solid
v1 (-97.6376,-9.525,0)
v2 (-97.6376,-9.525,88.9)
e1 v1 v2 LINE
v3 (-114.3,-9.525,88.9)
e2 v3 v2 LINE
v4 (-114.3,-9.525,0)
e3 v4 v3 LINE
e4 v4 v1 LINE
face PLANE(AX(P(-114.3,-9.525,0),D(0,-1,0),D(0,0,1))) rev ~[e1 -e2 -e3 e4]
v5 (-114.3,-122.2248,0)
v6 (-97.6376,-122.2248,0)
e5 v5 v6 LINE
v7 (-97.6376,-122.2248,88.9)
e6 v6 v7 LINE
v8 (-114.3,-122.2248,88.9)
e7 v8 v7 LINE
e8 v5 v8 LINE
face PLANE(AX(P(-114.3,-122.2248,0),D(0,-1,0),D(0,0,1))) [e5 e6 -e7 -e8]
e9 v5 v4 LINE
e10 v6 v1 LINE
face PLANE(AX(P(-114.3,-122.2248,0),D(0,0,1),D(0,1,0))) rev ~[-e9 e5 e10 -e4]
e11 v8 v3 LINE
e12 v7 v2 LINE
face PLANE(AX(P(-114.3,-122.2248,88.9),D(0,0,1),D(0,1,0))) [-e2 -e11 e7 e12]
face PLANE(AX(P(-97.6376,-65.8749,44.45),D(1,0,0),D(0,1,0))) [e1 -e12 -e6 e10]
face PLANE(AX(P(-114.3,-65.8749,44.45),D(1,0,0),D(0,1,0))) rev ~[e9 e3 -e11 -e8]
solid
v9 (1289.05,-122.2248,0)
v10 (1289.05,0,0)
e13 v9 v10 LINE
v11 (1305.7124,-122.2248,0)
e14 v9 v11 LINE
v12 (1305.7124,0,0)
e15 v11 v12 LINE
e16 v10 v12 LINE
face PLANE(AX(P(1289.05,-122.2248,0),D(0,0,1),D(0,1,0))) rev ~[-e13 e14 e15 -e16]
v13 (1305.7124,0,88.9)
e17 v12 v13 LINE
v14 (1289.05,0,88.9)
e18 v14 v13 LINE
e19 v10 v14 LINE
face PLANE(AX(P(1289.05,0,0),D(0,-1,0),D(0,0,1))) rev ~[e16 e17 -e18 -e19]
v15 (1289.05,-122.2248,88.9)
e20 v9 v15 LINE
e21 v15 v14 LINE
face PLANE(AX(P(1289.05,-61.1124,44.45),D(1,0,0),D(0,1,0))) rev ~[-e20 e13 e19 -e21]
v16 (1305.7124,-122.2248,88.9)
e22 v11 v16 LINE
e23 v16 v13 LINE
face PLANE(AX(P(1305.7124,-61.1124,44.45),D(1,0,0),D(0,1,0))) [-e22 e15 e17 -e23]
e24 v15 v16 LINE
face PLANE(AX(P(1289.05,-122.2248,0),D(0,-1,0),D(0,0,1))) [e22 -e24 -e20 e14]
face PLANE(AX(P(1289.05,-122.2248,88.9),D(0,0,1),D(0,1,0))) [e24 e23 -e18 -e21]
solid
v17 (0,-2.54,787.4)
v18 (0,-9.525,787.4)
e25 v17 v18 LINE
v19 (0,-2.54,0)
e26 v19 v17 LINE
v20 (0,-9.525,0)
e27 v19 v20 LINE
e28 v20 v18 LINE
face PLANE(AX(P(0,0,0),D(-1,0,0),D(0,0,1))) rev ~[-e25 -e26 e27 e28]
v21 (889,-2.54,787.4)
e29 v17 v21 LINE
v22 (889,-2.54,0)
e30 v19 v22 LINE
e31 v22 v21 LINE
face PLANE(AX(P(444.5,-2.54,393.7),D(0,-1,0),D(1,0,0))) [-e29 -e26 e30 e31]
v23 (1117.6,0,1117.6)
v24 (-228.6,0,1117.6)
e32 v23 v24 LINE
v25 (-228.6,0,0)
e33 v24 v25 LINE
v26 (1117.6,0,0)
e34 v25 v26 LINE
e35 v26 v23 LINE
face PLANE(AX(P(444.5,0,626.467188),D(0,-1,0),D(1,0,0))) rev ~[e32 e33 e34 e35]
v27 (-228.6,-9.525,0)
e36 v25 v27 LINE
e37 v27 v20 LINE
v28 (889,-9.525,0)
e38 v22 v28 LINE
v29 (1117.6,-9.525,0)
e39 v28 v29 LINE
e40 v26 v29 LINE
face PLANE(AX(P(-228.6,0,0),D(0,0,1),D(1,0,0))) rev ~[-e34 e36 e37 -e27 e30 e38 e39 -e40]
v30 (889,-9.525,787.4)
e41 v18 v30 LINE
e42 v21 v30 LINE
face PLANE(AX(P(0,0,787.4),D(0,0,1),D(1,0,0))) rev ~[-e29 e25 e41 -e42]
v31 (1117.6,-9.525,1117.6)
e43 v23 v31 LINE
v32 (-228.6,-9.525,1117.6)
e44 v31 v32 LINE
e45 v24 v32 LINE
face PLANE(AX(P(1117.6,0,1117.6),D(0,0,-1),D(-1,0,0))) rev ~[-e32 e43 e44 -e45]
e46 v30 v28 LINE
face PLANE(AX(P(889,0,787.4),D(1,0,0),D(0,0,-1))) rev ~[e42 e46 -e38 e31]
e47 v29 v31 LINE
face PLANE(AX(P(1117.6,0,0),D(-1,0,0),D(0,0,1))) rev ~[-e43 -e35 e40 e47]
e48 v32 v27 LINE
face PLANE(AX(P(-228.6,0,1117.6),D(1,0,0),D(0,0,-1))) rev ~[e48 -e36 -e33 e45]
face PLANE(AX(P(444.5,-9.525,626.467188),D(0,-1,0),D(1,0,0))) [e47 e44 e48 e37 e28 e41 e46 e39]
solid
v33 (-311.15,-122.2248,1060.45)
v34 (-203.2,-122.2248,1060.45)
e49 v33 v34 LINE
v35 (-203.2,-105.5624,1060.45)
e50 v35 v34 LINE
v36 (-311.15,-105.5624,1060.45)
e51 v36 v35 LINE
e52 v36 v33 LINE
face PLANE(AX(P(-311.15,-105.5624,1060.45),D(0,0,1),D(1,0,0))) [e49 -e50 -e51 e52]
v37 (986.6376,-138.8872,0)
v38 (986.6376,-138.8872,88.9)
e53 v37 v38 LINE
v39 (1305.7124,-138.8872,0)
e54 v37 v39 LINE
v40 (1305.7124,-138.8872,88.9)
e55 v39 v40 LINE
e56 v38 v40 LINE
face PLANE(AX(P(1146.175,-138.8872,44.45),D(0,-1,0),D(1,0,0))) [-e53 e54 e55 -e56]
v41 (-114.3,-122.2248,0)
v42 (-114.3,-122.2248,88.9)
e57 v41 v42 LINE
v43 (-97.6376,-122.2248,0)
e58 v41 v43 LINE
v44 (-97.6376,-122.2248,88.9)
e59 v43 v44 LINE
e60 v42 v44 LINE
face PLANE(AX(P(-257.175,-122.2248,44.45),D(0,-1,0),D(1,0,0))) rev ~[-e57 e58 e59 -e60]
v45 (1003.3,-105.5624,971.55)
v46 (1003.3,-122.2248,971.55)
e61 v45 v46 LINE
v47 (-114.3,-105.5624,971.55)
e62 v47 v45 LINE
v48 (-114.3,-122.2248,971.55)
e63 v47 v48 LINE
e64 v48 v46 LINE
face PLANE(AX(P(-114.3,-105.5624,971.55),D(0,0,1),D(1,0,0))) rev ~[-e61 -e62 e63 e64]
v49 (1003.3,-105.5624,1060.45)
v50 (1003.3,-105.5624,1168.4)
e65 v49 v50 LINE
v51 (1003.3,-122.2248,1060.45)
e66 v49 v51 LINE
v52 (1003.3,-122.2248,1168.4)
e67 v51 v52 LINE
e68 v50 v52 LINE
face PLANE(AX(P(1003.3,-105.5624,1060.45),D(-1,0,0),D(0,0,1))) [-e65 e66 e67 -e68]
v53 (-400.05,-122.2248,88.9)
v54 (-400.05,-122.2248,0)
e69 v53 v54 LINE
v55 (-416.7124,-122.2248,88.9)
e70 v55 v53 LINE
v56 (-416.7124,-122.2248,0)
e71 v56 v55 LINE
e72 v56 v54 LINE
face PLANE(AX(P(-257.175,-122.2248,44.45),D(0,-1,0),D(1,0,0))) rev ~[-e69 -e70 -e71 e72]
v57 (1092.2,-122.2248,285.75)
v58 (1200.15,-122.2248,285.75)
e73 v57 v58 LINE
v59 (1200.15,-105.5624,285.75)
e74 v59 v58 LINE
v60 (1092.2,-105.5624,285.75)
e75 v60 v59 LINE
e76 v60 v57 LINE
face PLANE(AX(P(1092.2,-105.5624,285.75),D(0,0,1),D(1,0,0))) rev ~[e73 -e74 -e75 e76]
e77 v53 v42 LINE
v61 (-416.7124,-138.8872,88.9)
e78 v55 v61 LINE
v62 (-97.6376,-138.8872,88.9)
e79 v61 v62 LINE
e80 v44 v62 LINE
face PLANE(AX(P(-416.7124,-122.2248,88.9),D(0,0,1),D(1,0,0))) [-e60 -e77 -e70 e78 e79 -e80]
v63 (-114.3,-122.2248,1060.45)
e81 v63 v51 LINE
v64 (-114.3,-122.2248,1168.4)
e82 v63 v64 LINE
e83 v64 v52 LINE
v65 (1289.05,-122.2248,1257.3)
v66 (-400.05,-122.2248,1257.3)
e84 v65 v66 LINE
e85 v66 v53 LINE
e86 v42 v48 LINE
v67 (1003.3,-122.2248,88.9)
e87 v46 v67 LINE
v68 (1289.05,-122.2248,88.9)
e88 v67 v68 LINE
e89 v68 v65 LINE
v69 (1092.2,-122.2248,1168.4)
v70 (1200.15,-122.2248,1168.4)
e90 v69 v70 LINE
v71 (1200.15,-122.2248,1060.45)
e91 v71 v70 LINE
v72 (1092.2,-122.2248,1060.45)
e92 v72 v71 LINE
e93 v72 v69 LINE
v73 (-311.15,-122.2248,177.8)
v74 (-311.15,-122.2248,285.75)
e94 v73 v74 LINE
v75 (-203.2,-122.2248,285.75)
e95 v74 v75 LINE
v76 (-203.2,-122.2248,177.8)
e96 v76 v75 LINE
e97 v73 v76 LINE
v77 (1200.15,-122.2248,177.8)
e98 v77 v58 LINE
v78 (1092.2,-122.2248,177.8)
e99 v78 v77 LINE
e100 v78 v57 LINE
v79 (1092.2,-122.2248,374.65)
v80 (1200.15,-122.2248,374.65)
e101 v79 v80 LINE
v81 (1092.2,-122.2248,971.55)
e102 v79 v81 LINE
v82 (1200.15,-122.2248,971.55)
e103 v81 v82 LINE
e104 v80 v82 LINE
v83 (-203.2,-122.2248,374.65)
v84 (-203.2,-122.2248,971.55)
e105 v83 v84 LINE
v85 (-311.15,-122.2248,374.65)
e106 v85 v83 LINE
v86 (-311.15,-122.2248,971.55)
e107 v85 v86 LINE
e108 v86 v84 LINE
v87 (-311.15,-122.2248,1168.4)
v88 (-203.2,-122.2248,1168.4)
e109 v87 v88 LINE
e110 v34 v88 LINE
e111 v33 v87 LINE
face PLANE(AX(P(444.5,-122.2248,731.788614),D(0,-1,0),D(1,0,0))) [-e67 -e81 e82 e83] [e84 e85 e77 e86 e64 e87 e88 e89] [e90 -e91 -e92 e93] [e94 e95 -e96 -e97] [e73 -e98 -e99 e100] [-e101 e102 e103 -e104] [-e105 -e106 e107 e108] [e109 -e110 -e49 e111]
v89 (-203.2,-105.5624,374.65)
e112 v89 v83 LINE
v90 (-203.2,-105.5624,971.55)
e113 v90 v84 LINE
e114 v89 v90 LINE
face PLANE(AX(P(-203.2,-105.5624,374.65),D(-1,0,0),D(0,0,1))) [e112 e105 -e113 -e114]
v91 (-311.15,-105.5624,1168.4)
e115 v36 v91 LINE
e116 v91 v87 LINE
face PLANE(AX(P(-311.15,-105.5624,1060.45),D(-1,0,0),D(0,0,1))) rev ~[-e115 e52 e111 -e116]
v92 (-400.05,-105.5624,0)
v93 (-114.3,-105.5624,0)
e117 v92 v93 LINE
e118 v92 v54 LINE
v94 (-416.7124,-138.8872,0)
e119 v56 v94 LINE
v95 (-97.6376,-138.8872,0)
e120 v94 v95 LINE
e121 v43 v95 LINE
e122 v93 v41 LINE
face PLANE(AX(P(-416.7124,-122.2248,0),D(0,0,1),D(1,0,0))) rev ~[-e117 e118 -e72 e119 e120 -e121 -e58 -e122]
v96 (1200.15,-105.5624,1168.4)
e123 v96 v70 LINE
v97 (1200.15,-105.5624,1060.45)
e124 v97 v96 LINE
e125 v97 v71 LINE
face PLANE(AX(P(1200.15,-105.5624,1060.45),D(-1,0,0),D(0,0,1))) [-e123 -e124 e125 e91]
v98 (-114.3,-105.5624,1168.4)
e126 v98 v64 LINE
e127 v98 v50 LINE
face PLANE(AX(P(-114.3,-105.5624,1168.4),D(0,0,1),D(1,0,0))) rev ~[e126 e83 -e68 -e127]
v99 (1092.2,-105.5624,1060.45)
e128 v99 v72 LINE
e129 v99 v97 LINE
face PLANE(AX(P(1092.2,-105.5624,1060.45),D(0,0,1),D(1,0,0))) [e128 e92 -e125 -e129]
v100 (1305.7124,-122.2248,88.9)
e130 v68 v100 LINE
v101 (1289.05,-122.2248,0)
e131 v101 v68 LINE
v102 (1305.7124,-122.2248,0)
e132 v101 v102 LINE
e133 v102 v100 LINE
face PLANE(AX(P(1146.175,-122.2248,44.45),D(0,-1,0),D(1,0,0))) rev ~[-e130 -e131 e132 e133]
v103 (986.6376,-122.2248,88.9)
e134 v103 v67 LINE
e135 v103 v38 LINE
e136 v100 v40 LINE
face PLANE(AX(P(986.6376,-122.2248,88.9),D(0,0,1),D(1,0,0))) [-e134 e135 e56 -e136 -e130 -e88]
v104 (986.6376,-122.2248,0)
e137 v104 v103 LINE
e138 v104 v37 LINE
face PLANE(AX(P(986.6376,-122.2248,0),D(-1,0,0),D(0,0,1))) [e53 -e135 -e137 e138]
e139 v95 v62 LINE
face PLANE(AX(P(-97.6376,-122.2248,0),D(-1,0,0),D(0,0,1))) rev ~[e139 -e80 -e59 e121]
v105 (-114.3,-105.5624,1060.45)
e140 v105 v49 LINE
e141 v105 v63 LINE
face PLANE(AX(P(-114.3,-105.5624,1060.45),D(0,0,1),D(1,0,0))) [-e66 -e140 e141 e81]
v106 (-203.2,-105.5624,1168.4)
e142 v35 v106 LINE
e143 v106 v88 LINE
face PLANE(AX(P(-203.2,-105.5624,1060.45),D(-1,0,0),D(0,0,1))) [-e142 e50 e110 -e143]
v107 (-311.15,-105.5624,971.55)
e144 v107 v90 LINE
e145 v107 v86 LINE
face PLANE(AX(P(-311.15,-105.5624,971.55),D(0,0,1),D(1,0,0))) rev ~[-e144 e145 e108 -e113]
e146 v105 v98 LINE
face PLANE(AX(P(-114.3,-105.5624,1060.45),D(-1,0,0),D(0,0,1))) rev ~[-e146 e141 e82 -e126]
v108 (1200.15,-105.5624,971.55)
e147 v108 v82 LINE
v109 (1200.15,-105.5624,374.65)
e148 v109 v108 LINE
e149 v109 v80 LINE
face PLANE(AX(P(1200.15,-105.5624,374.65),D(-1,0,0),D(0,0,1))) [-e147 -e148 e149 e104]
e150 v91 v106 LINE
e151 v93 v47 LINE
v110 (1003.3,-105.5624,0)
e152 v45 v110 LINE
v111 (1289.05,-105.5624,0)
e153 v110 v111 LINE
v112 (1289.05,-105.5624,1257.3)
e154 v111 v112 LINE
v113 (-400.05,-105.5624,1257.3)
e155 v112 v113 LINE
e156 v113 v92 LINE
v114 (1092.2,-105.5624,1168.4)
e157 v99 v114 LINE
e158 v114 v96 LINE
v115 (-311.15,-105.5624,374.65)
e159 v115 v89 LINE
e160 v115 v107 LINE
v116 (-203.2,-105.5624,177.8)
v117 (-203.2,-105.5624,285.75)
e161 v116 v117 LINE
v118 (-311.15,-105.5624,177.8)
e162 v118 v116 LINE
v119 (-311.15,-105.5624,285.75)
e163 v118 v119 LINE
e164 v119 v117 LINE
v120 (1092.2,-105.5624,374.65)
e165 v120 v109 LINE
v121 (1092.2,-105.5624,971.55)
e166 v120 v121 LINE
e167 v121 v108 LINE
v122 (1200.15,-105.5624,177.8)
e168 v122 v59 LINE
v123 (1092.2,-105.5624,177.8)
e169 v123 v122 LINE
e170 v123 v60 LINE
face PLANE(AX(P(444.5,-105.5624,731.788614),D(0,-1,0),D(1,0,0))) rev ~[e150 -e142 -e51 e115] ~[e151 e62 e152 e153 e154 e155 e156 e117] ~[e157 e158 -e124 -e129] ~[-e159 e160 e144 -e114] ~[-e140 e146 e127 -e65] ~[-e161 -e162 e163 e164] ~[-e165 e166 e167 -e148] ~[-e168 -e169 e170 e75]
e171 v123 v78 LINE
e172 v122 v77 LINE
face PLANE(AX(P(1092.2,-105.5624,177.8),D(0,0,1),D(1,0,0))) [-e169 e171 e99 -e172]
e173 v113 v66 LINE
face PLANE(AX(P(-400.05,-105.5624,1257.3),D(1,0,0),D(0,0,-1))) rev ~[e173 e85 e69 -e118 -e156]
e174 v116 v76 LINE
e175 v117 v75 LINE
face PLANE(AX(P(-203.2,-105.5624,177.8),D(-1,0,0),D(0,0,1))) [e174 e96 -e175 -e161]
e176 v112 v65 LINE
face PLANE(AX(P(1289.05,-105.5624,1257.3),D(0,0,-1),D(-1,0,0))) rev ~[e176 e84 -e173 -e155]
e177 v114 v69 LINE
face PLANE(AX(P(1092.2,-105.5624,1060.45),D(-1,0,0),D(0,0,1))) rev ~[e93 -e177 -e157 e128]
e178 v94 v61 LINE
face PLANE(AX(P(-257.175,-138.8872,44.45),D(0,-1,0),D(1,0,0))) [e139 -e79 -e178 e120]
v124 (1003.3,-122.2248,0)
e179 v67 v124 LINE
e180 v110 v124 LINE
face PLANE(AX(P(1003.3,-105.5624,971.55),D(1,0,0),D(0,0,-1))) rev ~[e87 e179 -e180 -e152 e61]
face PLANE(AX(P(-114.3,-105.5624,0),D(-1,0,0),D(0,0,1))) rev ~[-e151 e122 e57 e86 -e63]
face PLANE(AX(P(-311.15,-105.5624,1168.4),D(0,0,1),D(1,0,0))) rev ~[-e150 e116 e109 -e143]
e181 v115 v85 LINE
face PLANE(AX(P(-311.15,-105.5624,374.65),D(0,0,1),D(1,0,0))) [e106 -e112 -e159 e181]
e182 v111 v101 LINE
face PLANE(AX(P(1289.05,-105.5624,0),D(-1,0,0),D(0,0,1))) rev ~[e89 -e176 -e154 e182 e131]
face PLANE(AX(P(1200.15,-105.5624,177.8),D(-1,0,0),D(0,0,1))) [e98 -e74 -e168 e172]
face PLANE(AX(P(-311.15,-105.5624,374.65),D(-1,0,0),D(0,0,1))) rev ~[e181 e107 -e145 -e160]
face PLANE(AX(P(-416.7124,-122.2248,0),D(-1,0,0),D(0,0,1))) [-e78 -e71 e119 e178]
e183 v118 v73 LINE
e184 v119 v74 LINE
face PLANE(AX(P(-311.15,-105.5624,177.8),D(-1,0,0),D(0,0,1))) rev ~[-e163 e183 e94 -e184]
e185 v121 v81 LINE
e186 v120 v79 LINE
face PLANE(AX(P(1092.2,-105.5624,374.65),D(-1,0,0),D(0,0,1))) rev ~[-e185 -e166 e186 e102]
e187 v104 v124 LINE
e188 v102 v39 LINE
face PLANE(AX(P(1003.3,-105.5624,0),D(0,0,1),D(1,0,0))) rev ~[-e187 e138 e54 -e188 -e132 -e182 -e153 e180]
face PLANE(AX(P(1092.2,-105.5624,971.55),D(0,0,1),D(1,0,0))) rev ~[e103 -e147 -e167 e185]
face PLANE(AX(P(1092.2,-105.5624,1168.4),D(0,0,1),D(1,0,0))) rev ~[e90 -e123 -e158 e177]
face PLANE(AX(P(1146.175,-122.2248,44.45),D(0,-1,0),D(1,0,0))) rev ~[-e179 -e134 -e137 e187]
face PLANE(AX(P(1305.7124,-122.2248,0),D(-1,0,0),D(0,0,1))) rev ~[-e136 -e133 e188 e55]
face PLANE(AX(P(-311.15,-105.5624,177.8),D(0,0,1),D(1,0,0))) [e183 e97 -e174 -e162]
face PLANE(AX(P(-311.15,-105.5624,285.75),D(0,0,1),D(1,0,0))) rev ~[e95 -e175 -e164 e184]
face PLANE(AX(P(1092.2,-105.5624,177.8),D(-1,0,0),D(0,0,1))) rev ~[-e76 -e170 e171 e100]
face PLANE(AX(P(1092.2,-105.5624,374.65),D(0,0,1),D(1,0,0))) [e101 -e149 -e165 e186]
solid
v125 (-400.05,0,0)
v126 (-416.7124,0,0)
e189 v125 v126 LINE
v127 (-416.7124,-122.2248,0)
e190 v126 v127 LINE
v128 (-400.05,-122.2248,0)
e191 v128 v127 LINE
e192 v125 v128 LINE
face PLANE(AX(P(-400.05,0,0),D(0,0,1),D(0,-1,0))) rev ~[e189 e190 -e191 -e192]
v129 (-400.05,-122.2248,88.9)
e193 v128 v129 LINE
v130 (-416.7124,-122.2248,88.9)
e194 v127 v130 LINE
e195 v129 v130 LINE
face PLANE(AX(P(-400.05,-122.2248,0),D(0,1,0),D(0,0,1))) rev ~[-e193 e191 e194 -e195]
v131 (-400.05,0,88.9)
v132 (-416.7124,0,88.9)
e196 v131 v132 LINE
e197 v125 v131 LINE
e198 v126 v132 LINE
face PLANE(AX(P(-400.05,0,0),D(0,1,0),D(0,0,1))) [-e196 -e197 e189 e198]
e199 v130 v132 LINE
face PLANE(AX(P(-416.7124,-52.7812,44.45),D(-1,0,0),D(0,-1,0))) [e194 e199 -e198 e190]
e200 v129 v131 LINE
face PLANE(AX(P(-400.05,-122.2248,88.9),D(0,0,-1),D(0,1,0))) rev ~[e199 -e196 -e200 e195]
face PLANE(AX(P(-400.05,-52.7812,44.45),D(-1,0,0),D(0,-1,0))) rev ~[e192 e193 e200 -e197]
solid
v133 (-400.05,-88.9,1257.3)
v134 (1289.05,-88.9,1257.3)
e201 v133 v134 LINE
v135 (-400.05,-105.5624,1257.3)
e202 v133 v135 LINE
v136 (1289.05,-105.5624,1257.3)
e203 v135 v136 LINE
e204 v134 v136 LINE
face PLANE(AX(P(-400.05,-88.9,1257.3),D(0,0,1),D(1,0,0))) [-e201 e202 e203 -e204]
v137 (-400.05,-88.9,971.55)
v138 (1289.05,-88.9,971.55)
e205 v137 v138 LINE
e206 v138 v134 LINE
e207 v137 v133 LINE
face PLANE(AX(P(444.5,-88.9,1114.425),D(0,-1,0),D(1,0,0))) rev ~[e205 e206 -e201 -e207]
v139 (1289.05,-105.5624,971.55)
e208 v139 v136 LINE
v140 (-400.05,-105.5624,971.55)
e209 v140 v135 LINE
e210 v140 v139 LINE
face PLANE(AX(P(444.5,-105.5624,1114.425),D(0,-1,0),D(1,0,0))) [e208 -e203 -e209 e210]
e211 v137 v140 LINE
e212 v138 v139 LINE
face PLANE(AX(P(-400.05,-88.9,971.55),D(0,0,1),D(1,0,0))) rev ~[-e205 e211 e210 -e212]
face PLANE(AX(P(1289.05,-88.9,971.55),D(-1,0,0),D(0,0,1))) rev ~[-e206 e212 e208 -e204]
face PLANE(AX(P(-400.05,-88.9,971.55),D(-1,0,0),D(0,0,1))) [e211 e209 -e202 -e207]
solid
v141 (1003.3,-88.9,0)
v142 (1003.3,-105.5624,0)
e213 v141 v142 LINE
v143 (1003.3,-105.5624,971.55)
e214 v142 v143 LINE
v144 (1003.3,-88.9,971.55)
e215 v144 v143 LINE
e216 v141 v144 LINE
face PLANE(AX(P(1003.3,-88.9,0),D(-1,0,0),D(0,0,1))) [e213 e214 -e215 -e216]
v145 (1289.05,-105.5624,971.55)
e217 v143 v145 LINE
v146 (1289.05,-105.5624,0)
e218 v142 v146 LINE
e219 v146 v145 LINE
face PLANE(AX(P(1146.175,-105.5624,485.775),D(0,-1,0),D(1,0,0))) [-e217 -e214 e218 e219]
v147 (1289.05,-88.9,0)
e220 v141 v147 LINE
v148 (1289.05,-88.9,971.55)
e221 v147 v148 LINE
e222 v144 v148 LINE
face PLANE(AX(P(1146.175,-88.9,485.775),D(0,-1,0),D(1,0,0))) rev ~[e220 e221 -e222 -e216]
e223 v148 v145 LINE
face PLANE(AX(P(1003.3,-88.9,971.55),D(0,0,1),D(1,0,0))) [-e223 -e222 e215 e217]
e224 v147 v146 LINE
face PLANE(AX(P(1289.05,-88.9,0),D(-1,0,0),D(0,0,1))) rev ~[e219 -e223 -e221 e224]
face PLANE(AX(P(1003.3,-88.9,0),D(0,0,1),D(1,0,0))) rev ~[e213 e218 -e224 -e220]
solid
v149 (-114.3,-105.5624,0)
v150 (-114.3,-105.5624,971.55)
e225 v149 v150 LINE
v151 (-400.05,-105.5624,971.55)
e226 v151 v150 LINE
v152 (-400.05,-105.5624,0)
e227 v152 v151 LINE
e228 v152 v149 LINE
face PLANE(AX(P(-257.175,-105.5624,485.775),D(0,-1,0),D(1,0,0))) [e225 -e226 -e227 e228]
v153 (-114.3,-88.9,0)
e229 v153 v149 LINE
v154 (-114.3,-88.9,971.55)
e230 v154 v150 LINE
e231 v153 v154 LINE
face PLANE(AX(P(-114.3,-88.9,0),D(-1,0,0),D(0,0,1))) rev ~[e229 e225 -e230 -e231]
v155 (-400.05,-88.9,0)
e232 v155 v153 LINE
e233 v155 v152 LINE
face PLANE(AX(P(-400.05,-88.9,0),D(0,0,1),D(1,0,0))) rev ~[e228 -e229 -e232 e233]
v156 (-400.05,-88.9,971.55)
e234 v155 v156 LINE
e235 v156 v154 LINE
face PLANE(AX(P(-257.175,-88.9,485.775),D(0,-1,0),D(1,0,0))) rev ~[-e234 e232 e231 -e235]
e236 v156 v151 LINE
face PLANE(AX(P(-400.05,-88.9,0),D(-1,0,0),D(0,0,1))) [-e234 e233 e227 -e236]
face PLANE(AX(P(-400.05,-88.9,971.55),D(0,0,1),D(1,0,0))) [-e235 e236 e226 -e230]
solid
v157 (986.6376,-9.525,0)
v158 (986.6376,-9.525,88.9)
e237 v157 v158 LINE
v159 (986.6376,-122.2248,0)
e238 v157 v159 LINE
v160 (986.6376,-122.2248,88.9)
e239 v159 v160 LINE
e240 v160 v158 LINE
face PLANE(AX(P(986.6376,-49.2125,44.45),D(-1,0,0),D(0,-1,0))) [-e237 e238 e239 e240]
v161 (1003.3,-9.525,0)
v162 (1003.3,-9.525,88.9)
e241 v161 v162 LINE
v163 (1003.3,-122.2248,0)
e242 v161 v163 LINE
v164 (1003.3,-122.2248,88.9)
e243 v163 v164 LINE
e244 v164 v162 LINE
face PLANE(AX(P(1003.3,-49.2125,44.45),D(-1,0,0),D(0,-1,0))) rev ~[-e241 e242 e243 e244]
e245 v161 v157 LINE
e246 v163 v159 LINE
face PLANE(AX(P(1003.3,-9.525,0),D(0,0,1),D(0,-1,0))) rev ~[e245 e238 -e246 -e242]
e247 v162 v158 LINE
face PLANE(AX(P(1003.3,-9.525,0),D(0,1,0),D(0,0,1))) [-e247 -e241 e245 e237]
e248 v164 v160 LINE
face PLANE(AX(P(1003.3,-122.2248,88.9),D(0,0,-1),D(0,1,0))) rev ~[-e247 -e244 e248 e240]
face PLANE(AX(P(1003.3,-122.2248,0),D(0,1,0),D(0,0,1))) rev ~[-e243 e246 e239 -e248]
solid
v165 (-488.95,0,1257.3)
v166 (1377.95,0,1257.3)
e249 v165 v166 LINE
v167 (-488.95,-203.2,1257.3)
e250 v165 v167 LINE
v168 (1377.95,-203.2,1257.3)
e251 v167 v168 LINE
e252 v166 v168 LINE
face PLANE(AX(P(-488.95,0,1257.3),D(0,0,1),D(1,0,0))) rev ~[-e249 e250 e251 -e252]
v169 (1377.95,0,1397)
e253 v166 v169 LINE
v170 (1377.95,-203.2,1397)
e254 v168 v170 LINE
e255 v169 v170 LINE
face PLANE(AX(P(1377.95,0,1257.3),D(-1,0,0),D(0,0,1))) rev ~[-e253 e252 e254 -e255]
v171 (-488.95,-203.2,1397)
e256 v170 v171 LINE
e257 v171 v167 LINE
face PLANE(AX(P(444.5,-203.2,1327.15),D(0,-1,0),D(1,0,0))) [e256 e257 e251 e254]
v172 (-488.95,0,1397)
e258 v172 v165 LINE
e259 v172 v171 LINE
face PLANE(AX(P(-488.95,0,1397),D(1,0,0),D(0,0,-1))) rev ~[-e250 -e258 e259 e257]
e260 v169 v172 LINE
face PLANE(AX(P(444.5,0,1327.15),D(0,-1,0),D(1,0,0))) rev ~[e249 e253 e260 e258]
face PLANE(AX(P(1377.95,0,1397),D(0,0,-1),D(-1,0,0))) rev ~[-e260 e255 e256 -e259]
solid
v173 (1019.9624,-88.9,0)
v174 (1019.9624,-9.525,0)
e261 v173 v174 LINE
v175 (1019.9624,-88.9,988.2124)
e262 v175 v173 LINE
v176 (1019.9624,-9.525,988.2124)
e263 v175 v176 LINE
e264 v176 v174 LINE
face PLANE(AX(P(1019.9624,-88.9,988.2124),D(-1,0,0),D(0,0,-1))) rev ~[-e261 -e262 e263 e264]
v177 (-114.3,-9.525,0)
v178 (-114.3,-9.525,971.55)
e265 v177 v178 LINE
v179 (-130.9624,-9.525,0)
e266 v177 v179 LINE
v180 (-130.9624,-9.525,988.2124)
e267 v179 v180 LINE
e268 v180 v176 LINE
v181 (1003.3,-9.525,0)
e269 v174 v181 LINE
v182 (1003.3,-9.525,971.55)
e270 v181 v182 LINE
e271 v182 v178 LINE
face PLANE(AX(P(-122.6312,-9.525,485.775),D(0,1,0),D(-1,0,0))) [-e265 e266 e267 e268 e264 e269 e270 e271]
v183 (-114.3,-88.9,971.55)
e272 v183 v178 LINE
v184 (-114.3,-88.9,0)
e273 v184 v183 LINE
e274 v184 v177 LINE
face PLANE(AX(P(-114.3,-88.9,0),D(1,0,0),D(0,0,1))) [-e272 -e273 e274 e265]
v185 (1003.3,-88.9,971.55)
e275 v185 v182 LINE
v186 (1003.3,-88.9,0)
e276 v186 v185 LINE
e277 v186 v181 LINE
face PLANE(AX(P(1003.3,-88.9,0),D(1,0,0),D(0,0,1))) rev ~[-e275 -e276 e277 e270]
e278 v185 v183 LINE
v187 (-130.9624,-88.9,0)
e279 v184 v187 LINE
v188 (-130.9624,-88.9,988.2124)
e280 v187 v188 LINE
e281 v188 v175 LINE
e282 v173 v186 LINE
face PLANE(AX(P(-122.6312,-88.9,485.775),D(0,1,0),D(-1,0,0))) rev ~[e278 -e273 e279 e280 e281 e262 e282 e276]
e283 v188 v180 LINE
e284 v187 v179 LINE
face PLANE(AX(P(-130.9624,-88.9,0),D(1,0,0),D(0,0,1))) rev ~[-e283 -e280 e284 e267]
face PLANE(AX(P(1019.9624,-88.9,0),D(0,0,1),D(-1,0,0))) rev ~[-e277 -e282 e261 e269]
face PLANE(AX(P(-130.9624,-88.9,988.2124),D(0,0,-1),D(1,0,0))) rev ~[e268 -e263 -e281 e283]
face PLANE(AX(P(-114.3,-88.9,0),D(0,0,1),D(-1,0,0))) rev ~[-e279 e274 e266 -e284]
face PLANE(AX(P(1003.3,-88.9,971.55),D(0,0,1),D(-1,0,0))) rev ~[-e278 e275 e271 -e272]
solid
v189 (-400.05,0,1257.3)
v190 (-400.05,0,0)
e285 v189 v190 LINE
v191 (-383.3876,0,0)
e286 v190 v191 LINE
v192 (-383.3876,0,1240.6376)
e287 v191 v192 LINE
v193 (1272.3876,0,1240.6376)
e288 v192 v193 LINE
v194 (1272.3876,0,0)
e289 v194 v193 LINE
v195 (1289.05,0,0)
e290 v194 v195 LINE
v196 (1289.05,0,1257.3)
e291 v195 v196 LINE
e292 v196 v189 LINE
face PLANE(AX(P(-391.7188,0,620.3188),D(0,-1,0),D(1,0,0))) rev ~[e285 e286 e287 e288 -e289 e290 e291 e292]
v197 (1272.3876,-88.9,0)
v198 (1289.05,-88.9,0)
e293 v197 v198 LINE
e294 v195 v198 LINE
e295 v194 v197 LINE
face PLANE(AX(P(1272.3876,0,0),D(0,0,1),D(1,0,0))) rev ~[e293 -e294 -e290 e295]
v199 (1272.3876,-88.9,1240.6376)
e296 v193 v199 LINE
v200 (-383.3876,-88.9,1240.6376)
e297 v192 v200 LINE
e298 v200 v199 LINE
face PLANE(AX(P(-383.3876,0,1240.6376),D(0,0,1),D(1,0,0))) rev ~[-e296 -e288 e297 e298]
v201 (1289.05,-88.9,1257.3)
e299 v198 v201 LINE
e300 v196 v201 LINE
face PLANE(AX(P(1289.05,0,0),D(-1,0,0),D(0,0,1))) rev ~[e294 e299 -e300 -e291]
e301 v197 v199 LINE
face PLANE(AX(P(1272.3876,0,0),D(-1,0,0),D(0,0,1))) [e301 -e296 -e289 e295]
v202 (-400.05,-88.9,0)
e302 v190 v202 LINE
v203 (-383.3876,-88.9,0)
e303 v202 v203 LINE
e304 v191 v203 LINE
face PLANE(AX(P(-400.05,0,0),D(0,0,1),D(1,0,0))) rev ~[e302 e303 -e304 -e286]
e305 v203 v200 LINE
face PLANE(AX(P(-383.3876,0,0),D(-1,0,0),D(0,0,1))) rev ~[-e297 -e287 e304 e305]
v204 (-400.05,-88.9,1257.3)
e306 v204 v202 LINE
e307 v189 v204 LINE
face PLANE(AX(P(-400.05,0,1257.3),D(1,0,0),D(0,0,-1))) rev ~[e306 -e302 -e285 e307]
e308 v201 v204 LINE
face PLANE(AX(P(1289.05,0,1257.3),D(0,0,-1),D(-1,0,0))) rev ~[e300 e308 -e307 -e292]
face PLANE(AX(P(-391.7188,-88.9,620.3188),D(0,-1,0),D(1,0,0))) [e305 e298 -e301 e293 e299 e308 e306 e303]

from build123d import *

# Parameters (mm, degrees)
F0_W      = 889
F0_H      = 787.4
F1_DEPTH  = 2.54
F3_DEPTH  = 9.525
F4_W      = 16.6624
F4_H      = 1240.6376
F5_DEPTH  = 88.9
F6_W      = 1689.1
F6_H      = 285.75
F7_DEPTH  = 16.6624
F8_W      = 285.75
F8_H      = 971.55
F9_DEPTH  = 16.6624
F10_W     = 107.95
F10_H     = 107.95
F10_H_2   = 596.9
F10_W_2   = 1117.6
F11_DEPTH = 16.6624
F12_W     = 319.0748
F12_H     = 88.9
F13_DEPTH = 16.6624
F15_DEPTH = 203.2
F16_W     = 122.2248
F16_H     = 88.9
F17_DEPTH = 16.6624
F18_W     = 105.5624
F18_H     = 88.9
F18_W_2   = 16.6624
F19_DEPTH = 16.6624
F20_W     = 16.6624
F20_H     = 971.55
F21_DEPTH = 79.375
F22_W     = 112.6998
F22_H     = 88.9
F23_DEPTH = 16.6624
F24_W     = 79.375
F24_H     = 88.9
F24_W_2   = 33.3248
F25_DEPTH = 16.6624


# Not quite as in the source:
# - a feature names something its author has since deleted; it is built from what else it names


with BuildPart() as f1:
    # F0 (on Front) → F1 (new body)
    with BuildSketch(Plane.XZ):
        with Locations((444.5, 393.7)):
            Rectangle(F0_W, F0_H)
    extrude(amount=F1_DEPTH)

    # F2 (on Front) → F3 (join)
    with BuildSketch(Plane.XZ):
        Polygon((-228.6, 0), (0, 0), (0, 787.4), (889, 787.4), (889, 0), (1117.6, 0), (1117.6, 1117.6), (-228.6, 1117.6), align=None)
    extrude(amount=F3_DEPTH)


with BuildPart() as f5:
    # F4 (on Front) → F5 (new body)
    with BuildSketch(Plane.XZ):
        with Locations((-391.7188, 620.3188)):
            Rectangle(F4_W, F4_H)
        Polygon((-383.3876, 1240.6376), (1272.3876, 1240.6376), (1289.05, 1240.6376), (1289.05, 1257.3), (-400.05, 1257.3), (-400.05, 1240.6376), align=None)
        with Locations((1280.7188, 620.3188)):
            Rectangle(F4_W, F4_H)
    extrude(amount=F5_DEPTH)


with BuildPart() as f7:
    # F6 (on face) → F7 (new body)
    with BuildSketch(Plane.XZ.offset(88.9)):
        with Locations((444.5, 1114.425)):
            Rectangle(F6_W, F6_H)
    extrude(amount=F7_DEPTH)


with BuildPart() as f9:
    # F8 (on face) → F9 (new body)
    with BuildSketch(Plane.XZ.offset(88.9)):
        with Locations((-257.175, 485.775)):
            Rectangle(F8_W, F8_H)
    extrude(amount=F9_DEPTH)


with BuildPart() as f9b:
    # F8 (on face) → F9, piece 2 (new body)
    with BuildSketch(Plane.XZ.offset(88.9)):
        with Locations((1146.175, 485.775)):
            Rectangle(F8_W, F8_H)
    extrude(amount=F9_DEPTH)


with BuildPart() as f11:
    # F10 (on face) → F11 (new body)
    with BuildSketch(Plane.XZ.offset(105.5624)):
        Polygon((-400.05, 971.55), (-400.05, 0), (-114.3, 0), (-114.3, 971.55), (1003.3, 971.55), (1003.3, 0), (1289.05, 0), (1289.05, 971.55), (1289.05, 1257.3), (-400.05, 1257.3), align=None)
        with Locations((-257.175, 231.775)):
            Rectangle(F10_W, F10_H, mode=Mode.SUBTRACT)
        with Locations((1146.175, 231.775)):
            Rectangle(F10_W, F10_H, mode=Mode.SUBTRACT)
        with Locations((-257.175, 673.1)):
            Rectangle(F10_W, F10_H_2, mode=Mode.SUBTRACT)
        with Locations((-257.175, 1114.425)):
            Rectangle(F10_W, F10_H, mode=Mode.SUBTRACT)
        with Locations((1146.175, 673.1)):
            Rectangle(F10_W, F10_H_2, mode=Mode.SUBTRACT)
        with Locations((444.5, 1114.425)):
            Rectangle(F10_W_2, F10_H, mode=Mode.SUBTRACT)
        with Locations((1146.175, 1114.425)):
            Rectangle(F10_W, F10_H, mode=Mode.SUBTRACT)
    extrude(amount=F11_DEPTH)

    # F12 (on face) → F13 (join)
    with BuildSketch(Plane.XZ.offset(122.2248)):
        with Locations((-257.175, 44.45)):
            Rectangle(F12_W, F12_H)
        with Locations((1146.175, 44.45)):
            Rectangle(F12_W, F12_H)
    extrude(amount=F13_DEPTH)


with BuildPart() as f15:
    # F14 (on Front) → F15 (new body)
    with BuildSketch(Plane.XZ):
        Polygon((-488.95, 1257.3), (-400.05, 1257.3), (1289.05, 1257.3), (1377.95, 1257.3), (1377.95, 1397), (-488.95, 1397), align=None)
    extrude(amount=F15_DEPTH)


with BuildPart() as f17:
    # F16 (on face) → F17 (new body)
    with BuildSketch(Plane.YZ.offset(1289.05)):
        with Locations((-61.1124, 44.45)):
            Rectangle(F16_W, F16_H)
    extrude(amount=F17_DEPTH)


with BuildPart() as f19:
    # F18 (on face) → F19 (new body)
    with BuildSketch(Plane(origin=(-400.05, 0, 0), x_dir=(0, -1, 0), z_dir=(-1, 0, 0))):
        with Locations((52.7812, 44.45)):
            Rectangle(F18_W, F18_H)
        with Locations((113.8936, 44.45)):
            Rectangle(F18_W_2, F18_H)
    extrude(amount=F19_DEPTH)


with BuildPart() as f21:
    # F20 (on face) → F21 (new body)
    with BuildSketch(Plane(origin=(0, -88.9, 0), x_dir=(-1, 0, 0), z_dir=(0, 1, 0))):
        with Locations((122.6312, 485.775)):
            Rectangle(F20_W, F20_H)
        Polygon((-1003.3, 971.55), (114.3, 971.55), (130.9624, 971.55), (130.9624, 988.2124), (-1019.9624, 988.2124), (-1019.9624, 971.55), align=None)
        with Locations((-1011.6312, 485.775)):
            Rectangle(F20_W, F20_H)
    extrude(amount=F21_DEPTH)


with BuildPart() as f23:
    # F22 (on face) → F23 (new body)
    with BuildSketch(Plane.YZ.offset(-114.3)):
        with Locations((-65.8749, 44.45)):
            Rectangle(F22_W, F22_H)
    extrude(amount=F23_DEPTH)


with BuildPart() as f25:
    # F24 (on face) → F25 (new body)
    with BuildSketch(Plane(origin=(1003.3, 0, 0), x_dir=(0, -1, 0), z_dir=(-1, 0, 0))):
        with Locations((49.2125, 44.45)):
            Rectangle(F24_W, F24_H)
        with Locations((105.5624, 44.45)):
            Rectangle(F24_W_2, F24_H)
    extrude(amount=F25_DEPTH)


solid = Compound([f1.part, f5.part, f7.part, f9.part, f9b.part, f11.part, f15.part, f17.part, f19.part, f21.part, f23.part, f25.part])
